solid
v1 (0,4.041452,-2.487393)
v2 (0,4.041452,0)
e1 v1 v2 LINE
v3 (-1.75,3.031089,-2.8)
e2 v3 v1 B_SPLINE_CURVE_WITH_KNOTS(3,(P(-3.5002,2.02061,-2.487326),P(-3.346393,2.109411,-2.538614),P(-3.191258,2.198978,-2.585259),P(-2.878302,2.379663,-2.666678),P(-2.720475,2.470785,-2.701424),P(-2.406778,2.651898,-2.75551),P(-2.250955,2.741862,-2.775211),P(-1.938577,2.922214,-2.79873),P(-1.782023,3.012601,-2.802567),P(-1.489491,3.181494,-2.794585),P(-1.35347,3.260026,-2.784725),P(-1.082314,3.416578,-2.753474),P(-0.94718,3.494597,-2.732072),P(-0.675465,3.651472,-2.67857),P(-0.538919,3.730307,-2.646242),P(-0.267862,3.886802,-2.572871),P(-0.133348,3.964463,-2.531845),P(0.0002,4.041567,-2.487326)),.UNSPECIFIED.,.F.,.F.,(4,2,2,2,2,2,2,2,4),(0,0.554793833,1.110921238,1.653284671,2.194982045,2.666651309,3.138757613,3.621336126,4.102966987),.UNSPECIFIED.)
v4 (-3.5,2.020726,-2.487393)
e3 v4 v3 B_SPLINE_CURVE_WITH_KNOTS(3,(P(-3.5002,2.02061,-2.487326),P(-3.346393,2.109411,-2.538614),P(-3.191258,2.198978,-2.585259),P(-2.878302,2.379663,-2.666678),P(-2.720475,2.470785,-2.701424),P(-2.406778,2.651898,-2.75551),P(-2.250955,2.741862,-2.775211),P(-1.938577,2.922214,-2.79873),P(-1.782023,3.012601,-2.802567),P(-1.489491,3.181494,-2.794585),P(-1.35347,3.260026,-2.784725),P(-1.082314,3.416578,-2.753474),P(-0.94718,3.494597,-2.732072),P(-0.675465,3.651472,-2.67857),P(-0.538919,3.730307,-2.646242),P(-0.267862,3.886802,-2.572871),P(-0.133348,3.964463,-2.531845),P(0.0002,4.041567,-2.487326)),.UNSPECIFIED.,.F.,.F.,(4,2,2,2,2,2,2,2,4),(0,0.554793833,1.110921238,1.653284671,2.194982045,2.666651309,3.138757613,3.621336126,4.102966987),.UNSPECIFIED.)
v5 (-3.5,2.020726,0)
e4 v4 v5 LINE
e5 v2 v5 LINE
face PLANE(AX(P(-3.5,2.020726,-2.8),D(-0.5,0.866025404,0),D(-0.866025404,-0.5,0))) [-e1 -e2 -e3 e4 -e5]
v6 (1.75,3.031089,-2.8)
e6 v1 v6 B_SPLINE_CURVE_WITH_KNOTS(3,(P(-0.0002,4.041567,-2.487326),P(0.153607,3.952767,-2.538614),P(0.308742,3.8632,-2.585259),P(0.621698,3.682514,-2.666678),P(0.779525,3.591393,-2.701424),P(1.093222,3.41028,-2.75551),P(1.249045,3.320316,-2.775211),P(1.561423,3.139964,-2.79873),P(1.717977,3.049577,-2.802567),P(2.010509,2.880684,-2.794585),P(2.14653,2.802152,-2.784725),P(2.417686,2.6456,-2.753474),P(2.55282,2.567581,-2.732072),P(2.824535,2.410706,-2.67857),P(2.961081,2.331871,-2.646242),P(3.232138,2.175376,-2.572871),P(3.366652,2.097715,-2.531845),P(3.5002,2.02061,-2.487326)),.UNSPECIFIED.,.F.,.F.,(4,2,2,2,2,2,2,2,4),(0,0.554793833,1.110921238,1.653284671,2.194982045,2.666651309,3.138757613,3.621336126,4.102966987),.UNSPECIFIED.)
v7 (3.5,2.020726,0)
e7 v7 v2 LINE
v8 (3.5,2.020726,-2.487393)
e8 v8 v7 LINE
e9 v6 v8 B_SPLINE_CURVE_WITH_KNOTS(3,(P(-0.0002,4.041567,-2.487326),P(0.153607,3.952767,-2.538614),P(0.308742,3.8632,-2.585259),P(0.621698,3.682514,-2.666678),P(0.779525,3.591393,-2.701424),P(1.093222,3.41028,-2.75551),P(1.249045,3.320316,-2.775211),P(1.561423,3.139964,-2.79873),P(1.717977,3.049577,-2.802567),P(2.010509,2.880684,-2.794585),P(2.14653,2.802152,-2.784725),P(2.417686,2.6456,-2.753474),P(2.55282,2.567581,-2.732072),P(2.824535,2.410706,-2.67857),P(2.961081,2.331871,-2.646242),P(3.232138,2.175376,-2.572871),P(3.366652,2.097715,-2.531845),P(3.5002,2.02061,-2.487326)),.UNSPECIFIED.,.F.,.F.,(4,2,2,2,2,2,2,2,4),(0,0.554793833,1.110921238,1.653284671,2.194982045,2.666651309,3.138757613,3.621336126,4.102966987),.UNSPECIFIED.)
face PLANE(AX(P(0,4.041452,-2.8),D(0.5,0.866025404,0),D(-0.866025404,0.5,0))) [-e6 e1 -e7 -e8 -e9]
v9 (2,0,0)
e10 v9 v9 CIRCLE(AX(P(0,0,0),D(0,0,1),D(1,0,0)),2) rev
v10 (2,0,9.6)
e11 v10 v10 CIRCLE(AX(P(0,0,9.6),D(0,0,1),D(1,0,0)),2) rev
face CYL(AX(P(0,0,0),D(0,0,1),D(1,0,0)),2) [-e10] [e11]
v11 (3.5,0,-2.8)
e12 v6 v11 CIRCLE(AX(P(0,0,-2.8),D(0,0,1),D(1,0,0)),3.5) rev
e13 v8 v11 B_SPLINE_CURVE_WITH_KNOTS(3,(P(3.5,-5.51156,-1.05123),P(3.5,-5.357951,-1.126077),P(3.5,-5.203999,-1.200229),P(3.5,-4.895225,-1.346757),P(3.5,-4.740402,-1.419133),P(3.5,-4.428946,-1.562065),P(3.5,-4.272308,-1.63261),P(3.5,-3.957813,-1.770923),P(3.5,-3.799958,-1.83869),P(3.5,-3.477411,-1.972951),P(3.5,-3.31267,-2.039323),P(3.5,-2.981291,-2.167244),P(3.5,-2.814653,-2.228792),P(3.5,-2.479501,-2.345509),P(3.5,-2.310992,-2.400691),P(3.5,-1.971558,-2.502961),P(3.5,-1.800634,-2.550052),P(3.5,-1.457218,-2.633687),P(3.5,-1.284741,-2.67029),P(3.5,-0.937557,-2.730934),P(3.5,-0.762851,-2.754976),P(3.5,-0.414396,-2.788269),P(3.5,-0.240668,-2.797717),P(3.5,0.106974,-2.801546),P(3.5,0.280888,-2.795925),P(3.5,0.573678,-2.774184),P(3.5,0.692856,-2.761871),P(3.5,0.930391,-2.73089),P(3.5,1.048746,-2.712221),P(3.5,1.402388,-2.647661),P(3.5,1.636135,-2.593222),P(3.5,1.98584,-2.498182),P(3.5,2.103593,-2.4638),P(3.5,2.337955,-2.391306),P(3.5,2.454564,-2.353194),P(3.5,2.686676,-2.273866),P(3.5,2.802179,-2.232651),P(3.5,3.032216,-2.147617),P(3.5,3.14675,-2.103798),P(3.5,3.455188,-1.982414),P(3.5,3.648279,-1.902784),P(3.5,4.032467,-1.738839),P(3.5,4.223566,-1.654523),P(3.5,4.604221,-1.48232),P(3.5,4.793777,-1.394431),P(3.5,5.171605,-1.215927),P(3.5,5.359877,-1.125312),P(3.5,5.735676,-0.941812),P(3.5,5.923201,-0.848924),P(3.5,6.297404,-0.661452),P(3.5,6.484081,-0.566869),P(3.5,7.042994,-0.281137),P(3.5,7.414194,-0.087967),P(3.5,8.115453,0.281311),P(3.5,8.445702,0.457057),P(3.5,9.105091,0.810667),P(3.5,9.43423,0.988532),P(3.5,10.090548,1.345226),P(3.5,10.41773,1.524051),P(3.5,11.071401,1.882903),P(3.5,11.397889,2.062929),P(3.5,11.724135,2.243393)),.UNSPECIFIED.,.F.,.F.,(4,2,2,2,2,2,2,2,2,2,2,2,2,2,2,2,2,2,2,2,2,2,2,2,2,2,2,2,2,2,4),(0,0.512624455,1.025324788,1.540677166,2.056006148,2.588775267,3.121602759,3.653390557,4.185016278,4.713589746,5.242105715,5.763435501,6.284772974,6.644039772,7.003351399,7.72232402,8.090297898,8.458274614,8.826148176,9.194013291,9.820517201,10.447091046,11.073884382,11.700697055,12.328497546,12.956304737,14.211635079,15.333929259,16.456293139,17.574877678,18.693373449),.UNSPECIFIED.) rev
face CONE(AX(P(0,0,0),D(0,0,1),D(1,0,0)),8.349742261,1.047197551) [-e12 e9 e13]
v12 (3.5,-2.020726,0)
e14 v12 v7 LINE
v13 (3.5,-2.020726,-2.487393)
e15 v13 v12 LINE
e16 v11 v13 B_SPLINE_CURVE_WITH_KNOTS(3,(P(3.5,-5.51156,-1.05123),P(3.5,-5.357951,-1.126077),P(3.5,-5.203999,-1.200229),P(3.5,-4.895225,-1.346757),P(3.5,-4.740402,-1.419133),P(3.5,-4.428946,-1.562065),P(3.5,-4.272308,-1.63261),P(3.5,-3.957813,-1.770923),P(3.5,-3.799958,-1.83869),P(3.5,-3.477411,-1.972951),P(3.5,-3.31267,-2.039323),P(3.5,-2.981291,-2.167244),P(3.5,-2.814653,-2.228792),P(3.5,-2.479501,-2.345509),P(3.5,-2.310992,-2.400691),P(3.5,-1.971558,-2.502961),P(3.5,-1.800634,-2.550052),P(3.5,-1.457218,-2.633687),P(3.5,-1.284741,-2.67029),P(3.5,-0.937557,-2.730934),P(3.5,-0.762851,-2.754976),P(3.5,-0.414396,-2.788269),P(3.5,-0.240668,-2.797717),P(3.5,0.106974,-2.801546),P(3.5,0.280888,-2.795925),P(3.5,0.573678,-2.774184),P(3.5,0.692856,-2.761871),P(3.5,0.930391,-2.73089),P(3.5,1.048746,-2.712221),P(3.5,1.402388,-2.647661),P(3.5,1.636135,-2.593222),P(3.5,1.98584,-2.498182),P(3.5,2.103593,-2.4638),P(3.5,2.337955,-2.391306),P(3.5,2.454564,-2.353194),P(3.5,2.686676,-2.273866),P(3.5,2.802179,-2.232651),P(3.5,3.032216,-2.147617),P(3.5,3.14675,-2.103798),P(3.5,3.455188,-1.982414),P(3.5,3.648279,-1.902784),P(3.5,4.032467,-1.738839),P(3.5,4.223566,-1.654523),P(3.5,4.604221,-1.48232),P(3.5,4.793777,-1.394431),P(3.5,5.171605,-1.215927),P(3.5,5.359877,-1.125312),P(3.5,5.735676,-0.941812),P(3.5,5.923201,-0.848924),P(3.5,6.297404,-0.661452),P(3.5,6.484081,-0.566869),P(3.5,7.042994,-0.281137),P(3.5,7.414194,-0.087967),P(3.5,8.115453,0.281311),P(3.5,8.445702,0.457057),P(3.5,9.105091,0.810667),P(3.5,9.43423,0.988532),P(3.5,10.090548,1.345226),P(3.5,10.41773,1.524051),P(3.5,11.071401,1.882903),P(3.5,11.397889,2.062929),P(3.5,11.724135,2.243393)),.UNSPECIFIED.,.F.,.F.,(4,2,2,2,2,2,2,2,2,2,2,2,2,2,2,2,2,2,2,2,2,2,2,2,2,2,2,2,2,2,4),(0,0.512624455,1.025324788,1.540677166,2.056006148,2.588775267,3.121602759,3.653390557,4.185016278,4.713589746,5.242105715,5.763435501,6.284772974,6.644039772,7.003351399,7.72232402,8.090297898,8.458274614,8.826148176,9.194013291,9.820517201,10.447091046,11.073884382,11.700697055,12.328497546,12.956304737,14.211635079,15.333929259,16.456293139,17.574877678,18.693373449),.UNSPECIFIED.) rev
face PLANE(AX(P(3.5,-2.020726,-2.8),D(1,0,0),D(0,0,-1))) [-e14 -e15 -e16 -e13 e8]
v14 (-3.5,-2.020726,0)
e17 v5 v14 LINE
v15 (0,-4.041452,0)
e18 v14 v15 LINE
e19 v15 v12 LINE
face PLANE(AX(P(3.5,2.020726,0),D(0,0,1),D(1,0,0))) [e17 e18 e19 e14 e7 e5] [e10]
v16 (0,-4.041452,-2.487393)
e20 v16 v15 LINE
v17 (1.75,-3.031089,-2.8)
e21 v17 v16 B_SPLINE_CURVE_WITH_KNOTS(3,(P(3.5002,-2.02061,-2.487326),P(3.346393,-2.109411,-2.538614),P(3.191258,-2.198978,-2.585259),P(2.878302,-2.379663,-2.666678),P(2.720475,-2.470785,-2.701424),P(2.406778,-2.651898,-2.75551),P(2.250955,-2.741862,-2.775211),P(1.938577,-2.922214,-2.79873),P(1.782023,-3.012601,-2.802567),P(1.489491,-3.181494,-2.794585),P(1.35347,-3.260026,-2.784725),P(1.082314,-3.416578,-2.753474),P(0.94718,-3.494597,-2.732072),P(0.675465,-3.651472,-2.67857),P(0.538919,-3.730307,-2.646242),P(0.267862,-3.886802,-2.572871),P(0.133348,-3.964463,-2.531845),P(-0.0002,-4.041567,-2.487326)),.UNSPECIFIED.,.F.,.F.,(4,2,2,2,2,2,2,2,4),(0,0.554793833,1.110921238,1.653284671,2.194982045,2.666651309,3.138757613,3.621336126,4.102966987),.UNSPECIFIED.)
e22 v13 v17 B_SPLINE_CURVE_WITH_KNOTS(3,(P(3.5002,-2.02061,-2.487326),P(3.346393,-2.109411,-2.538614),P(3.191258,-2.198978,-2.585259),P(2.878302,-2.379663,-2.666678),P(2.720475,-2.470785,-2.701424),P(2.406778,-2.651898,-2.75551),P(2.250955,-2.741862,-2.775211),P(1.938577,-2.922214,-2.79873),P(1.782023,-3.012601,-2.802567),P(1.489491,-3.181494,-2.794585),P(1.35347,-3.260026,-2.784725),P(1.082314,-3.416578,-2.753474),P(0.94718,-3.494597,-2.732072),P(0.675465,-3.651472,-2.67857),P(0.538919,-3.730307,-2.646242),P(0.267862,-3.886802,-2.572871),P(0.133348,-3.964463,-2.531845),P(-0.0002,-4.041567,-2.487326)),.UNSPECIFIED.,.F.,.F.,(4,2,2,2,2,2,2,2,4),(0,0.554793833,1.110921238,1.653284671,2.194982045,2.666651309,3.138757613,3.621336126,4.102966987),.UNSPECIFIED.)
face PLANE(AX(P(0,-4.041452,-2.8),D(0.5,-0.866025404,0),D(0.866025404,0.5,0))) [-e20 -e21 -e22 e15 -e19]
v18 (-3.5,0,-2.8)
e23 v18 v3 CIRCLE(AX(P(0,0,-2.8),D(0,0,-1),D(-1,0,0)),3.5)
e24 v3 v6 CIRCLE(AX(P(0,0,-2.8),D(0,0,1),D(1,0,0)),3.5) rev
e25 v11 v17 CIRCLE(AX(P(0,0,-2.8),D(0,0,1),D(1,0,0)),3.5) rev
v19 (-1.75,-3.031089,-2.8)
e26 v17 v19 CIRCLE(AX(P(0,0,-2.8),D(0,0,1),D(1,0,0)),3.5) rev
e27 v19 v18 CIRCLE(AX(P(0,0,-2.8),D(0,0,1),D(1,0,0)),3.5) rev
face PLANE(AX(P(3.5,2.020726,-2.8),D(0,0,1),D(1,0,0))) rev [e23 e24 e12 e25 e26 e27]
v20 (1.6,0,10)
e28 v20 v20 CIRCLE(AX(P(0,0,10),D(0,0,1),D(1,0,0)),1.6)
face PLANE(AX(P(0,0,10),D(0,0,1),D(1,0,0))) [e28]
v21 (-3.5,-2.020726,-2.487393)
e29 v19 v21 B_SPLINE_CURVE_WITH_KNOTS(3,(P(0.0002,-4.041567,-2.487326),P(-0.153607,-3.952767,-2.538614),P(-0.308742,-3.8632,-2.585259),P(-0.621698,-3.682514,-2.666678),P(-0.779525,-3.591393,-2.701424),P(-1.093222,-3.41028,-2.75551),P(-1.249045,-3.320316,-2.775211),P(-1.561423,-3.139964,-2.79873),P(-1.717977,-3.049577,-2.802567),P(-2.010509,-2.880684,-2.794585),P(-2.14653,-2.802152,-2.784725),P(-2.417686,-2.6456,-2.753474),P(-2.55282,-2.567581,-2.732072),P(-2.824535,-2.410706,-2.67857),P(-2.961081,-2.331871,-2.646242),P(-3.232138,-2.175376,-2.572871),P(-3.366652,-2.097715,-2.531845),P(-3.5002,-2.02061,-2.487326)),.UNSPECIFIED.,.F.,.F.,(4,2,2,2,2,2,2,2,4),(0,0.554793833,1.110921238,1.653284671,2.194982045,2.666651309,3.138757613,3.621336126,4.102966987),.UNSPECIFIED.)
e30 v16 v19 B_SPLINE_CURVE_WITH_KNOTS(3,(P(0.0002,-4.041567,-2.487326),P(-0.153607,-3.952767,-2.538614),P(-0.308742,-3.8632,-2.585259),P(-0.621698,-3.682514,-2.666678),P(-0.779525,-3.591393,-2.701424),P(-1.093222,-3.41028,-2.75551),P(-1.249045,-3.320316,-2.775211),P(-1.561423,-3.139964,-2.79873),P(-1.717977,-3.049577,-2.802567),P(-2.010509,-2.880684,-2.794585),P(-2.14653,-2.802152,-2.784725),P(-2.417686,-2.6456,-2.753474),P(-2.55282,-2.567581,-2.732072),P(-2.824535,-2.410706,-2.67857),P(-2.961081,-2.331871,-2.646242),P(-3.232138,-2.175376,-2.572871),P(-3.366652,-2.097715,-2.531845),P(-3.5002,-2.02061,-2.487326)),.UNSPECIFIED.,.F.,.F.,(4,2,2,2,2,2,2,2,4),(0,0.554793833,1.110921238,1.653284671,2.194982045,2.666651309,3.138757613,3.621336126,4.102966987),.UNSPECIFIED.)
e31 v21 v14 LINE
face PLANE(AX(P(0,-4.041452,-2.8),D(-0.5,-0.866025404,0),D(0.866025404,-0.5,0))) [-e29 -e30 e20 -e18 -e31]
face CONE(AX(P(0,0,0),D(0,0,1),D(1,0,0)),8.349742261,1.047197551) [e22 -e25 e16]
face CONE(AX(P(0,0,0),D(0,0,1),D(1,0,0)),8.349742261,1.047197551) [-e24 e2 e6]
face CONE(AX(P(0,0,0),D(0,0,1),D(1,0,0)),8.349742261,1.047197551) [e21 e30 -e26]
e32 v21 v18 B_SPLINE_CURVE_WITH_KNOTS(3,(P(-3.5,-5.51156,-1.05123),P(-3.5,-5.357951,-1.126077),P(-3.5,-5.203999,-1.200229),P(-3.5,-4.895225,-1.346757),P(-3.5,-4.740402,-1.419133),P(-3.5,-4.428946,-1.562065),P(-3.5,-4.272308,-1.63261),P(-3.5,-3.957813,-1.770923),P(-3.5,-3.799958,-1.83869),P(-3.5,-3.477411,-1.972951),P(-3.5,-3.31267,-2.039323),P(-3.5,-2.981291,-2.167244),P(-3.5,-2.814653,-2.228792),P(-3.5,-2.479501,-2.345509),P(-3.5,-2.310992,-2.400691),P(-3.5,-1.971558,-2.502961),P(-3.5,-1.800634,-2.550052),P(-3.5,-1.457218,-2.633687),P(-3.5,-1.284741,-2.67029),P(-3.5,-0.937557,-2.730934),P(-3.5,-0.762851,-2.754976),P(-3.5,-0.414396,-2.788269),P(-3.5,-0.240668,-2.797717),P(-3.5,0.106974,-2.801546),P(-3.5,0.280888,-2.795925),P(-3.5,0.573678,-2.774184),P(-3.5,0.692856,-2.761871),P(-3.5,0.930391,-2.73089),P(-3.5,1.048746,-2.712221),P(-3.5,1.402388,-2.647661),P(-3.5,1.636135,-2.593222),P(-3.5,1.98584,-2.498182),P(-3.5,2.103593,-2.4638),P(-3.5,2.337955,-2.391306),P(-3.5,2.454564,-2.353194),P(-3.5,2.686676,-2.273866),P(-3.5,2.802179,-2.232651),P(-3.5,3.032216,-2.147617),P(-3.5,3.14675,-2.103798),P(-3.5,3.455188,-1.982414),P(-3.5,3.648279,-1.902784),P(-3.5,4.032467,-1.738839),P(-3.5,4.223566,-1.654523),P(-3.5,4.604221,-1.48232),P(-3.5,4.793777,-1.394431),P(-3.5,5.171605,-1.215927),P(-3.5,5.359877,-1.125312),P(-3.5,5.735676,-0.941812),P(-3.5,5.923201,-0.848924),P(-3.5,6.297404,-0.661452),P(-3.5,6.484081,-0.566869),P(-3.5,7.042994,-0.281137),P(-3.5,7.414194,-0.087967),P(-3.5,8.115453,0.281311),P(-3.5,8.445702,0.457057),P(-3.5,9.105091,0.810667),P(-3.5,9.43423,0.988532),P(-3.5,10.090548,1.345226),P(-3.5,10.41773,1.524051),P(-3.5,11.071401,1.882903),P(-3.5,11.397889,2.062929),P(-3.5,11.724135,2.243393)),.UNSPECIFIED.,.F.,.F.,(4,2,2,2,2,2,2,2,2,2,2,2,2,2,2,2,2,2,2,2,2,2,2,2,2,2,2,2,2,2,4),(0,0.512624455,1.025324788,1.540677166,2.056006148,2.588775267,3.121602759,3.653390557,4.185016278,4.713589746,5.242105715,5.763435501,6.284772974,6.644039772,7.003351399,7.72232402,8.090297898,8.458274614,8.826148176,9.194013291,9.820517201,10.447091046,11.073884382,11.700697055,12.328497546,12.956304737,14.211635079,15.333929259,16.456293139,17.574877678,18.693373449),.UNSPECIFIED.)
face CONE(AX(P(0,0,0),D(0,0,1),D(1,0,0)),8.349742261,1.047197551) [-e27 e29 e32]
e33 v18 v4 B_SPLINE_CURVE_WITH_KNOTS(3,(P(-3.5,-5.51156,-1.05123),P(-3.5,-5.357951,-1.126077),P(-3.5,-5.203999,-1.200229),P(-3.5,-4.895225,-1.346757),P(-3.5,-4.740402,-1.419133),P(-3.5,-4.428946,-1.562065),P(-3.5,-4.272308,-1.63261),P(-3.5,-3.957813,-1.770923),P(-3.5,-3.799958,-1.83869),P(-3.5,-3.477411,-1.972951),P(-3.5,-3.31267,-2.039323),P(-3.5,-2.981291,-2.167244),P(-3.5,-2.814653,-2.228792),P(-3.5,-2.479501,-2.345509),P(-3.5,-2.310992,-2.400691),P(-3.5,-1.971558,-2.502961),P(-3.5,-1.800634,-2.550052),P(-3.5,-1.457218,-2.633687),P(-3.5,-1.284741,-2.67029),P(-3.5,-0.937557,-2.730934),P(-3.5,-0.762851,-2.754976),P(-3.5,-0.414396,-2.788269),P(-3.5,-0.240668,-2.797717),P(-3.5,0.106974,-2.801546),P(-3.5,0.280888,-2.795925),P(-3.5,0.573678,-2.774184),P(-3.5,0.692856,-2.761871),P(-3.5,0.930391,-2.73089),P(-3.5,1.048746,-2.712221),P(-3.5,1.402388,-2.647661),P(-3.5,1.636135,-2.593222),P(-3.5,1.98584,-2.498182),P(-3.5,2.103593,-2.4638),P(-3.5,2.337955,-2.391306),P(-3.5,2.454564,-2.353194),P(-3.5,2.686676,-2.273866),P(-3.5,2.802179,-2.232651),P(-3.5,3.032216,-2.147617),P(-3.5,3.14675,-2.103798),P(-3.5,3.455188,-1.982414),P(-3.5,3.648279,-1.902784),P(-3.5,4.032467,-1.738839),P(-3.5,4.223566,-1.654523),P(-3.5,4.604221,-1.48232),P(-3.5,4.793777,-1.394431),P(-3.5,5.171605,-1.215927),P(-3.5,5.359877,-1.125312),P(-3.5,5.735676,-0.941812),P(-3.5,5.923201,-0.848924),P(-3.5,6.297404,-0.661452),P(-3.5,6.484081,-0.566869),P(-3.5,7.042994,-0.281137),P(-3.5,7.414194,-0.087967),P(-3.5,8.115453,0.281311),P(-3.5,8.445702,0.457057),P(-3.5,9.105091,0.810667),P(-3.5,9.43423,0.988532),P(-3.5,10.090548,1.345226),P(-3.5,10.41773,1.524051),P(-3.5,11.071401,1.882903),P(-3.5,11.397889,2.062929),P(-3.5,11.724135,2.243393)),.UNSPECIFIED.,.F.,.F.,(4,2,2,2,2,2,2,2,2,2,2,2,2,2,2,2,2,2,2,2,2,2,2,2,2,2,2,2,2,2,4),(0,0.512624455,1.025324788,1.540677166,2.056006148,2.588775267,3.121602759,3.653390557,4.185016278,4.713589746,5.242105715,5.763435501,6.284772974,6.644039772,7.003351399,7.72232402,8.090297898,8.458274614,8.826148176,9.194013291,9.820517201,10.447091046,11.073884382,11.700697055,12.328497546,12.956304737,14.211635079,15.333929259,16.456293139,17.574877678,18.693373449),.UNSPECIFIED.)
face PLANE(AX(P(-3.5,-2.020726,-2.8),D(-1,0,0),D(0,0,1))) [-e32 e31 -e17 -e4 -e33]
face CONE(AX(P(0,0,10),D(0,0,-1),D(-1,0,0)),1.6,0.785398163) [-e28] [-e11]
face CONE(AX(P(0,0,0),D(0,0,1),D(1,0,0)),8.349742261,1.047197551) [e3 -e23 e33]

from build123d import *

# Parameters (mm, degrees)
ESQUISSE1_W        = 2
ESQUISSE1_H        = 10
BOSS_EXTRU_1_DEPTH = 2.8


with BuildPart() as part:
    # Esquisse1 → Base-Révolution (revolve)
    with BuildSketch(Plane(origin=(0, 0, 0), x_dir=(1, 0, 0), z_dir=(0, 1, 0))):
        with Locations((1, -5)):
            Rectangle(ESQUISSE1_W, ESQUISSE1_H)
    revolve(axis=Axis((0, 0, 0), (0, 0, 1)))

    # Chanfrein1: read off the stored shape, not the designer's step
    # Chanfrein1 outline → Chanfrein1 (revolve, cut)
    with BuildSketch(Plane.XZ):
        Polygon((2, 10), (1.6, 10), (2, 9.6), align=None)
    revolve(axis=Axis((0, 0, 0), (0, 0, 1)), mode=Mode.SUBTRACT)

    # Esquisse6 → Boss.-Extru.1 (add)
    with BuildSketch(Plane.XY):
        Polygon((3.5, -2.020725942), (3.5, 2.020725942), (0, 4.041451884), (-3.5, 2.020725942), (-3.5, -2.020725942), (0, -4.041451884), align=None)
    extrude(amount=-BOSS_EXTRU_1_DEPTH)

    # Esquisse7 → Enlèvement de matière-Révolution1 (revolve, cut)
    with BuildSketch(Plane(origin=(0, 0, 0), x_dir=(1, 0, 0), z_dir=(0, 1, 0))):
        Polygon((-3.5, 2.8), (-8.349742261, 2.8), (-8.349742261, 0), align=None)
    revolve(axis=Axis((0, 0, -6.239446496), (0, 0, 1)), mode=Mode.SUBTRACT)


solid = part.part
